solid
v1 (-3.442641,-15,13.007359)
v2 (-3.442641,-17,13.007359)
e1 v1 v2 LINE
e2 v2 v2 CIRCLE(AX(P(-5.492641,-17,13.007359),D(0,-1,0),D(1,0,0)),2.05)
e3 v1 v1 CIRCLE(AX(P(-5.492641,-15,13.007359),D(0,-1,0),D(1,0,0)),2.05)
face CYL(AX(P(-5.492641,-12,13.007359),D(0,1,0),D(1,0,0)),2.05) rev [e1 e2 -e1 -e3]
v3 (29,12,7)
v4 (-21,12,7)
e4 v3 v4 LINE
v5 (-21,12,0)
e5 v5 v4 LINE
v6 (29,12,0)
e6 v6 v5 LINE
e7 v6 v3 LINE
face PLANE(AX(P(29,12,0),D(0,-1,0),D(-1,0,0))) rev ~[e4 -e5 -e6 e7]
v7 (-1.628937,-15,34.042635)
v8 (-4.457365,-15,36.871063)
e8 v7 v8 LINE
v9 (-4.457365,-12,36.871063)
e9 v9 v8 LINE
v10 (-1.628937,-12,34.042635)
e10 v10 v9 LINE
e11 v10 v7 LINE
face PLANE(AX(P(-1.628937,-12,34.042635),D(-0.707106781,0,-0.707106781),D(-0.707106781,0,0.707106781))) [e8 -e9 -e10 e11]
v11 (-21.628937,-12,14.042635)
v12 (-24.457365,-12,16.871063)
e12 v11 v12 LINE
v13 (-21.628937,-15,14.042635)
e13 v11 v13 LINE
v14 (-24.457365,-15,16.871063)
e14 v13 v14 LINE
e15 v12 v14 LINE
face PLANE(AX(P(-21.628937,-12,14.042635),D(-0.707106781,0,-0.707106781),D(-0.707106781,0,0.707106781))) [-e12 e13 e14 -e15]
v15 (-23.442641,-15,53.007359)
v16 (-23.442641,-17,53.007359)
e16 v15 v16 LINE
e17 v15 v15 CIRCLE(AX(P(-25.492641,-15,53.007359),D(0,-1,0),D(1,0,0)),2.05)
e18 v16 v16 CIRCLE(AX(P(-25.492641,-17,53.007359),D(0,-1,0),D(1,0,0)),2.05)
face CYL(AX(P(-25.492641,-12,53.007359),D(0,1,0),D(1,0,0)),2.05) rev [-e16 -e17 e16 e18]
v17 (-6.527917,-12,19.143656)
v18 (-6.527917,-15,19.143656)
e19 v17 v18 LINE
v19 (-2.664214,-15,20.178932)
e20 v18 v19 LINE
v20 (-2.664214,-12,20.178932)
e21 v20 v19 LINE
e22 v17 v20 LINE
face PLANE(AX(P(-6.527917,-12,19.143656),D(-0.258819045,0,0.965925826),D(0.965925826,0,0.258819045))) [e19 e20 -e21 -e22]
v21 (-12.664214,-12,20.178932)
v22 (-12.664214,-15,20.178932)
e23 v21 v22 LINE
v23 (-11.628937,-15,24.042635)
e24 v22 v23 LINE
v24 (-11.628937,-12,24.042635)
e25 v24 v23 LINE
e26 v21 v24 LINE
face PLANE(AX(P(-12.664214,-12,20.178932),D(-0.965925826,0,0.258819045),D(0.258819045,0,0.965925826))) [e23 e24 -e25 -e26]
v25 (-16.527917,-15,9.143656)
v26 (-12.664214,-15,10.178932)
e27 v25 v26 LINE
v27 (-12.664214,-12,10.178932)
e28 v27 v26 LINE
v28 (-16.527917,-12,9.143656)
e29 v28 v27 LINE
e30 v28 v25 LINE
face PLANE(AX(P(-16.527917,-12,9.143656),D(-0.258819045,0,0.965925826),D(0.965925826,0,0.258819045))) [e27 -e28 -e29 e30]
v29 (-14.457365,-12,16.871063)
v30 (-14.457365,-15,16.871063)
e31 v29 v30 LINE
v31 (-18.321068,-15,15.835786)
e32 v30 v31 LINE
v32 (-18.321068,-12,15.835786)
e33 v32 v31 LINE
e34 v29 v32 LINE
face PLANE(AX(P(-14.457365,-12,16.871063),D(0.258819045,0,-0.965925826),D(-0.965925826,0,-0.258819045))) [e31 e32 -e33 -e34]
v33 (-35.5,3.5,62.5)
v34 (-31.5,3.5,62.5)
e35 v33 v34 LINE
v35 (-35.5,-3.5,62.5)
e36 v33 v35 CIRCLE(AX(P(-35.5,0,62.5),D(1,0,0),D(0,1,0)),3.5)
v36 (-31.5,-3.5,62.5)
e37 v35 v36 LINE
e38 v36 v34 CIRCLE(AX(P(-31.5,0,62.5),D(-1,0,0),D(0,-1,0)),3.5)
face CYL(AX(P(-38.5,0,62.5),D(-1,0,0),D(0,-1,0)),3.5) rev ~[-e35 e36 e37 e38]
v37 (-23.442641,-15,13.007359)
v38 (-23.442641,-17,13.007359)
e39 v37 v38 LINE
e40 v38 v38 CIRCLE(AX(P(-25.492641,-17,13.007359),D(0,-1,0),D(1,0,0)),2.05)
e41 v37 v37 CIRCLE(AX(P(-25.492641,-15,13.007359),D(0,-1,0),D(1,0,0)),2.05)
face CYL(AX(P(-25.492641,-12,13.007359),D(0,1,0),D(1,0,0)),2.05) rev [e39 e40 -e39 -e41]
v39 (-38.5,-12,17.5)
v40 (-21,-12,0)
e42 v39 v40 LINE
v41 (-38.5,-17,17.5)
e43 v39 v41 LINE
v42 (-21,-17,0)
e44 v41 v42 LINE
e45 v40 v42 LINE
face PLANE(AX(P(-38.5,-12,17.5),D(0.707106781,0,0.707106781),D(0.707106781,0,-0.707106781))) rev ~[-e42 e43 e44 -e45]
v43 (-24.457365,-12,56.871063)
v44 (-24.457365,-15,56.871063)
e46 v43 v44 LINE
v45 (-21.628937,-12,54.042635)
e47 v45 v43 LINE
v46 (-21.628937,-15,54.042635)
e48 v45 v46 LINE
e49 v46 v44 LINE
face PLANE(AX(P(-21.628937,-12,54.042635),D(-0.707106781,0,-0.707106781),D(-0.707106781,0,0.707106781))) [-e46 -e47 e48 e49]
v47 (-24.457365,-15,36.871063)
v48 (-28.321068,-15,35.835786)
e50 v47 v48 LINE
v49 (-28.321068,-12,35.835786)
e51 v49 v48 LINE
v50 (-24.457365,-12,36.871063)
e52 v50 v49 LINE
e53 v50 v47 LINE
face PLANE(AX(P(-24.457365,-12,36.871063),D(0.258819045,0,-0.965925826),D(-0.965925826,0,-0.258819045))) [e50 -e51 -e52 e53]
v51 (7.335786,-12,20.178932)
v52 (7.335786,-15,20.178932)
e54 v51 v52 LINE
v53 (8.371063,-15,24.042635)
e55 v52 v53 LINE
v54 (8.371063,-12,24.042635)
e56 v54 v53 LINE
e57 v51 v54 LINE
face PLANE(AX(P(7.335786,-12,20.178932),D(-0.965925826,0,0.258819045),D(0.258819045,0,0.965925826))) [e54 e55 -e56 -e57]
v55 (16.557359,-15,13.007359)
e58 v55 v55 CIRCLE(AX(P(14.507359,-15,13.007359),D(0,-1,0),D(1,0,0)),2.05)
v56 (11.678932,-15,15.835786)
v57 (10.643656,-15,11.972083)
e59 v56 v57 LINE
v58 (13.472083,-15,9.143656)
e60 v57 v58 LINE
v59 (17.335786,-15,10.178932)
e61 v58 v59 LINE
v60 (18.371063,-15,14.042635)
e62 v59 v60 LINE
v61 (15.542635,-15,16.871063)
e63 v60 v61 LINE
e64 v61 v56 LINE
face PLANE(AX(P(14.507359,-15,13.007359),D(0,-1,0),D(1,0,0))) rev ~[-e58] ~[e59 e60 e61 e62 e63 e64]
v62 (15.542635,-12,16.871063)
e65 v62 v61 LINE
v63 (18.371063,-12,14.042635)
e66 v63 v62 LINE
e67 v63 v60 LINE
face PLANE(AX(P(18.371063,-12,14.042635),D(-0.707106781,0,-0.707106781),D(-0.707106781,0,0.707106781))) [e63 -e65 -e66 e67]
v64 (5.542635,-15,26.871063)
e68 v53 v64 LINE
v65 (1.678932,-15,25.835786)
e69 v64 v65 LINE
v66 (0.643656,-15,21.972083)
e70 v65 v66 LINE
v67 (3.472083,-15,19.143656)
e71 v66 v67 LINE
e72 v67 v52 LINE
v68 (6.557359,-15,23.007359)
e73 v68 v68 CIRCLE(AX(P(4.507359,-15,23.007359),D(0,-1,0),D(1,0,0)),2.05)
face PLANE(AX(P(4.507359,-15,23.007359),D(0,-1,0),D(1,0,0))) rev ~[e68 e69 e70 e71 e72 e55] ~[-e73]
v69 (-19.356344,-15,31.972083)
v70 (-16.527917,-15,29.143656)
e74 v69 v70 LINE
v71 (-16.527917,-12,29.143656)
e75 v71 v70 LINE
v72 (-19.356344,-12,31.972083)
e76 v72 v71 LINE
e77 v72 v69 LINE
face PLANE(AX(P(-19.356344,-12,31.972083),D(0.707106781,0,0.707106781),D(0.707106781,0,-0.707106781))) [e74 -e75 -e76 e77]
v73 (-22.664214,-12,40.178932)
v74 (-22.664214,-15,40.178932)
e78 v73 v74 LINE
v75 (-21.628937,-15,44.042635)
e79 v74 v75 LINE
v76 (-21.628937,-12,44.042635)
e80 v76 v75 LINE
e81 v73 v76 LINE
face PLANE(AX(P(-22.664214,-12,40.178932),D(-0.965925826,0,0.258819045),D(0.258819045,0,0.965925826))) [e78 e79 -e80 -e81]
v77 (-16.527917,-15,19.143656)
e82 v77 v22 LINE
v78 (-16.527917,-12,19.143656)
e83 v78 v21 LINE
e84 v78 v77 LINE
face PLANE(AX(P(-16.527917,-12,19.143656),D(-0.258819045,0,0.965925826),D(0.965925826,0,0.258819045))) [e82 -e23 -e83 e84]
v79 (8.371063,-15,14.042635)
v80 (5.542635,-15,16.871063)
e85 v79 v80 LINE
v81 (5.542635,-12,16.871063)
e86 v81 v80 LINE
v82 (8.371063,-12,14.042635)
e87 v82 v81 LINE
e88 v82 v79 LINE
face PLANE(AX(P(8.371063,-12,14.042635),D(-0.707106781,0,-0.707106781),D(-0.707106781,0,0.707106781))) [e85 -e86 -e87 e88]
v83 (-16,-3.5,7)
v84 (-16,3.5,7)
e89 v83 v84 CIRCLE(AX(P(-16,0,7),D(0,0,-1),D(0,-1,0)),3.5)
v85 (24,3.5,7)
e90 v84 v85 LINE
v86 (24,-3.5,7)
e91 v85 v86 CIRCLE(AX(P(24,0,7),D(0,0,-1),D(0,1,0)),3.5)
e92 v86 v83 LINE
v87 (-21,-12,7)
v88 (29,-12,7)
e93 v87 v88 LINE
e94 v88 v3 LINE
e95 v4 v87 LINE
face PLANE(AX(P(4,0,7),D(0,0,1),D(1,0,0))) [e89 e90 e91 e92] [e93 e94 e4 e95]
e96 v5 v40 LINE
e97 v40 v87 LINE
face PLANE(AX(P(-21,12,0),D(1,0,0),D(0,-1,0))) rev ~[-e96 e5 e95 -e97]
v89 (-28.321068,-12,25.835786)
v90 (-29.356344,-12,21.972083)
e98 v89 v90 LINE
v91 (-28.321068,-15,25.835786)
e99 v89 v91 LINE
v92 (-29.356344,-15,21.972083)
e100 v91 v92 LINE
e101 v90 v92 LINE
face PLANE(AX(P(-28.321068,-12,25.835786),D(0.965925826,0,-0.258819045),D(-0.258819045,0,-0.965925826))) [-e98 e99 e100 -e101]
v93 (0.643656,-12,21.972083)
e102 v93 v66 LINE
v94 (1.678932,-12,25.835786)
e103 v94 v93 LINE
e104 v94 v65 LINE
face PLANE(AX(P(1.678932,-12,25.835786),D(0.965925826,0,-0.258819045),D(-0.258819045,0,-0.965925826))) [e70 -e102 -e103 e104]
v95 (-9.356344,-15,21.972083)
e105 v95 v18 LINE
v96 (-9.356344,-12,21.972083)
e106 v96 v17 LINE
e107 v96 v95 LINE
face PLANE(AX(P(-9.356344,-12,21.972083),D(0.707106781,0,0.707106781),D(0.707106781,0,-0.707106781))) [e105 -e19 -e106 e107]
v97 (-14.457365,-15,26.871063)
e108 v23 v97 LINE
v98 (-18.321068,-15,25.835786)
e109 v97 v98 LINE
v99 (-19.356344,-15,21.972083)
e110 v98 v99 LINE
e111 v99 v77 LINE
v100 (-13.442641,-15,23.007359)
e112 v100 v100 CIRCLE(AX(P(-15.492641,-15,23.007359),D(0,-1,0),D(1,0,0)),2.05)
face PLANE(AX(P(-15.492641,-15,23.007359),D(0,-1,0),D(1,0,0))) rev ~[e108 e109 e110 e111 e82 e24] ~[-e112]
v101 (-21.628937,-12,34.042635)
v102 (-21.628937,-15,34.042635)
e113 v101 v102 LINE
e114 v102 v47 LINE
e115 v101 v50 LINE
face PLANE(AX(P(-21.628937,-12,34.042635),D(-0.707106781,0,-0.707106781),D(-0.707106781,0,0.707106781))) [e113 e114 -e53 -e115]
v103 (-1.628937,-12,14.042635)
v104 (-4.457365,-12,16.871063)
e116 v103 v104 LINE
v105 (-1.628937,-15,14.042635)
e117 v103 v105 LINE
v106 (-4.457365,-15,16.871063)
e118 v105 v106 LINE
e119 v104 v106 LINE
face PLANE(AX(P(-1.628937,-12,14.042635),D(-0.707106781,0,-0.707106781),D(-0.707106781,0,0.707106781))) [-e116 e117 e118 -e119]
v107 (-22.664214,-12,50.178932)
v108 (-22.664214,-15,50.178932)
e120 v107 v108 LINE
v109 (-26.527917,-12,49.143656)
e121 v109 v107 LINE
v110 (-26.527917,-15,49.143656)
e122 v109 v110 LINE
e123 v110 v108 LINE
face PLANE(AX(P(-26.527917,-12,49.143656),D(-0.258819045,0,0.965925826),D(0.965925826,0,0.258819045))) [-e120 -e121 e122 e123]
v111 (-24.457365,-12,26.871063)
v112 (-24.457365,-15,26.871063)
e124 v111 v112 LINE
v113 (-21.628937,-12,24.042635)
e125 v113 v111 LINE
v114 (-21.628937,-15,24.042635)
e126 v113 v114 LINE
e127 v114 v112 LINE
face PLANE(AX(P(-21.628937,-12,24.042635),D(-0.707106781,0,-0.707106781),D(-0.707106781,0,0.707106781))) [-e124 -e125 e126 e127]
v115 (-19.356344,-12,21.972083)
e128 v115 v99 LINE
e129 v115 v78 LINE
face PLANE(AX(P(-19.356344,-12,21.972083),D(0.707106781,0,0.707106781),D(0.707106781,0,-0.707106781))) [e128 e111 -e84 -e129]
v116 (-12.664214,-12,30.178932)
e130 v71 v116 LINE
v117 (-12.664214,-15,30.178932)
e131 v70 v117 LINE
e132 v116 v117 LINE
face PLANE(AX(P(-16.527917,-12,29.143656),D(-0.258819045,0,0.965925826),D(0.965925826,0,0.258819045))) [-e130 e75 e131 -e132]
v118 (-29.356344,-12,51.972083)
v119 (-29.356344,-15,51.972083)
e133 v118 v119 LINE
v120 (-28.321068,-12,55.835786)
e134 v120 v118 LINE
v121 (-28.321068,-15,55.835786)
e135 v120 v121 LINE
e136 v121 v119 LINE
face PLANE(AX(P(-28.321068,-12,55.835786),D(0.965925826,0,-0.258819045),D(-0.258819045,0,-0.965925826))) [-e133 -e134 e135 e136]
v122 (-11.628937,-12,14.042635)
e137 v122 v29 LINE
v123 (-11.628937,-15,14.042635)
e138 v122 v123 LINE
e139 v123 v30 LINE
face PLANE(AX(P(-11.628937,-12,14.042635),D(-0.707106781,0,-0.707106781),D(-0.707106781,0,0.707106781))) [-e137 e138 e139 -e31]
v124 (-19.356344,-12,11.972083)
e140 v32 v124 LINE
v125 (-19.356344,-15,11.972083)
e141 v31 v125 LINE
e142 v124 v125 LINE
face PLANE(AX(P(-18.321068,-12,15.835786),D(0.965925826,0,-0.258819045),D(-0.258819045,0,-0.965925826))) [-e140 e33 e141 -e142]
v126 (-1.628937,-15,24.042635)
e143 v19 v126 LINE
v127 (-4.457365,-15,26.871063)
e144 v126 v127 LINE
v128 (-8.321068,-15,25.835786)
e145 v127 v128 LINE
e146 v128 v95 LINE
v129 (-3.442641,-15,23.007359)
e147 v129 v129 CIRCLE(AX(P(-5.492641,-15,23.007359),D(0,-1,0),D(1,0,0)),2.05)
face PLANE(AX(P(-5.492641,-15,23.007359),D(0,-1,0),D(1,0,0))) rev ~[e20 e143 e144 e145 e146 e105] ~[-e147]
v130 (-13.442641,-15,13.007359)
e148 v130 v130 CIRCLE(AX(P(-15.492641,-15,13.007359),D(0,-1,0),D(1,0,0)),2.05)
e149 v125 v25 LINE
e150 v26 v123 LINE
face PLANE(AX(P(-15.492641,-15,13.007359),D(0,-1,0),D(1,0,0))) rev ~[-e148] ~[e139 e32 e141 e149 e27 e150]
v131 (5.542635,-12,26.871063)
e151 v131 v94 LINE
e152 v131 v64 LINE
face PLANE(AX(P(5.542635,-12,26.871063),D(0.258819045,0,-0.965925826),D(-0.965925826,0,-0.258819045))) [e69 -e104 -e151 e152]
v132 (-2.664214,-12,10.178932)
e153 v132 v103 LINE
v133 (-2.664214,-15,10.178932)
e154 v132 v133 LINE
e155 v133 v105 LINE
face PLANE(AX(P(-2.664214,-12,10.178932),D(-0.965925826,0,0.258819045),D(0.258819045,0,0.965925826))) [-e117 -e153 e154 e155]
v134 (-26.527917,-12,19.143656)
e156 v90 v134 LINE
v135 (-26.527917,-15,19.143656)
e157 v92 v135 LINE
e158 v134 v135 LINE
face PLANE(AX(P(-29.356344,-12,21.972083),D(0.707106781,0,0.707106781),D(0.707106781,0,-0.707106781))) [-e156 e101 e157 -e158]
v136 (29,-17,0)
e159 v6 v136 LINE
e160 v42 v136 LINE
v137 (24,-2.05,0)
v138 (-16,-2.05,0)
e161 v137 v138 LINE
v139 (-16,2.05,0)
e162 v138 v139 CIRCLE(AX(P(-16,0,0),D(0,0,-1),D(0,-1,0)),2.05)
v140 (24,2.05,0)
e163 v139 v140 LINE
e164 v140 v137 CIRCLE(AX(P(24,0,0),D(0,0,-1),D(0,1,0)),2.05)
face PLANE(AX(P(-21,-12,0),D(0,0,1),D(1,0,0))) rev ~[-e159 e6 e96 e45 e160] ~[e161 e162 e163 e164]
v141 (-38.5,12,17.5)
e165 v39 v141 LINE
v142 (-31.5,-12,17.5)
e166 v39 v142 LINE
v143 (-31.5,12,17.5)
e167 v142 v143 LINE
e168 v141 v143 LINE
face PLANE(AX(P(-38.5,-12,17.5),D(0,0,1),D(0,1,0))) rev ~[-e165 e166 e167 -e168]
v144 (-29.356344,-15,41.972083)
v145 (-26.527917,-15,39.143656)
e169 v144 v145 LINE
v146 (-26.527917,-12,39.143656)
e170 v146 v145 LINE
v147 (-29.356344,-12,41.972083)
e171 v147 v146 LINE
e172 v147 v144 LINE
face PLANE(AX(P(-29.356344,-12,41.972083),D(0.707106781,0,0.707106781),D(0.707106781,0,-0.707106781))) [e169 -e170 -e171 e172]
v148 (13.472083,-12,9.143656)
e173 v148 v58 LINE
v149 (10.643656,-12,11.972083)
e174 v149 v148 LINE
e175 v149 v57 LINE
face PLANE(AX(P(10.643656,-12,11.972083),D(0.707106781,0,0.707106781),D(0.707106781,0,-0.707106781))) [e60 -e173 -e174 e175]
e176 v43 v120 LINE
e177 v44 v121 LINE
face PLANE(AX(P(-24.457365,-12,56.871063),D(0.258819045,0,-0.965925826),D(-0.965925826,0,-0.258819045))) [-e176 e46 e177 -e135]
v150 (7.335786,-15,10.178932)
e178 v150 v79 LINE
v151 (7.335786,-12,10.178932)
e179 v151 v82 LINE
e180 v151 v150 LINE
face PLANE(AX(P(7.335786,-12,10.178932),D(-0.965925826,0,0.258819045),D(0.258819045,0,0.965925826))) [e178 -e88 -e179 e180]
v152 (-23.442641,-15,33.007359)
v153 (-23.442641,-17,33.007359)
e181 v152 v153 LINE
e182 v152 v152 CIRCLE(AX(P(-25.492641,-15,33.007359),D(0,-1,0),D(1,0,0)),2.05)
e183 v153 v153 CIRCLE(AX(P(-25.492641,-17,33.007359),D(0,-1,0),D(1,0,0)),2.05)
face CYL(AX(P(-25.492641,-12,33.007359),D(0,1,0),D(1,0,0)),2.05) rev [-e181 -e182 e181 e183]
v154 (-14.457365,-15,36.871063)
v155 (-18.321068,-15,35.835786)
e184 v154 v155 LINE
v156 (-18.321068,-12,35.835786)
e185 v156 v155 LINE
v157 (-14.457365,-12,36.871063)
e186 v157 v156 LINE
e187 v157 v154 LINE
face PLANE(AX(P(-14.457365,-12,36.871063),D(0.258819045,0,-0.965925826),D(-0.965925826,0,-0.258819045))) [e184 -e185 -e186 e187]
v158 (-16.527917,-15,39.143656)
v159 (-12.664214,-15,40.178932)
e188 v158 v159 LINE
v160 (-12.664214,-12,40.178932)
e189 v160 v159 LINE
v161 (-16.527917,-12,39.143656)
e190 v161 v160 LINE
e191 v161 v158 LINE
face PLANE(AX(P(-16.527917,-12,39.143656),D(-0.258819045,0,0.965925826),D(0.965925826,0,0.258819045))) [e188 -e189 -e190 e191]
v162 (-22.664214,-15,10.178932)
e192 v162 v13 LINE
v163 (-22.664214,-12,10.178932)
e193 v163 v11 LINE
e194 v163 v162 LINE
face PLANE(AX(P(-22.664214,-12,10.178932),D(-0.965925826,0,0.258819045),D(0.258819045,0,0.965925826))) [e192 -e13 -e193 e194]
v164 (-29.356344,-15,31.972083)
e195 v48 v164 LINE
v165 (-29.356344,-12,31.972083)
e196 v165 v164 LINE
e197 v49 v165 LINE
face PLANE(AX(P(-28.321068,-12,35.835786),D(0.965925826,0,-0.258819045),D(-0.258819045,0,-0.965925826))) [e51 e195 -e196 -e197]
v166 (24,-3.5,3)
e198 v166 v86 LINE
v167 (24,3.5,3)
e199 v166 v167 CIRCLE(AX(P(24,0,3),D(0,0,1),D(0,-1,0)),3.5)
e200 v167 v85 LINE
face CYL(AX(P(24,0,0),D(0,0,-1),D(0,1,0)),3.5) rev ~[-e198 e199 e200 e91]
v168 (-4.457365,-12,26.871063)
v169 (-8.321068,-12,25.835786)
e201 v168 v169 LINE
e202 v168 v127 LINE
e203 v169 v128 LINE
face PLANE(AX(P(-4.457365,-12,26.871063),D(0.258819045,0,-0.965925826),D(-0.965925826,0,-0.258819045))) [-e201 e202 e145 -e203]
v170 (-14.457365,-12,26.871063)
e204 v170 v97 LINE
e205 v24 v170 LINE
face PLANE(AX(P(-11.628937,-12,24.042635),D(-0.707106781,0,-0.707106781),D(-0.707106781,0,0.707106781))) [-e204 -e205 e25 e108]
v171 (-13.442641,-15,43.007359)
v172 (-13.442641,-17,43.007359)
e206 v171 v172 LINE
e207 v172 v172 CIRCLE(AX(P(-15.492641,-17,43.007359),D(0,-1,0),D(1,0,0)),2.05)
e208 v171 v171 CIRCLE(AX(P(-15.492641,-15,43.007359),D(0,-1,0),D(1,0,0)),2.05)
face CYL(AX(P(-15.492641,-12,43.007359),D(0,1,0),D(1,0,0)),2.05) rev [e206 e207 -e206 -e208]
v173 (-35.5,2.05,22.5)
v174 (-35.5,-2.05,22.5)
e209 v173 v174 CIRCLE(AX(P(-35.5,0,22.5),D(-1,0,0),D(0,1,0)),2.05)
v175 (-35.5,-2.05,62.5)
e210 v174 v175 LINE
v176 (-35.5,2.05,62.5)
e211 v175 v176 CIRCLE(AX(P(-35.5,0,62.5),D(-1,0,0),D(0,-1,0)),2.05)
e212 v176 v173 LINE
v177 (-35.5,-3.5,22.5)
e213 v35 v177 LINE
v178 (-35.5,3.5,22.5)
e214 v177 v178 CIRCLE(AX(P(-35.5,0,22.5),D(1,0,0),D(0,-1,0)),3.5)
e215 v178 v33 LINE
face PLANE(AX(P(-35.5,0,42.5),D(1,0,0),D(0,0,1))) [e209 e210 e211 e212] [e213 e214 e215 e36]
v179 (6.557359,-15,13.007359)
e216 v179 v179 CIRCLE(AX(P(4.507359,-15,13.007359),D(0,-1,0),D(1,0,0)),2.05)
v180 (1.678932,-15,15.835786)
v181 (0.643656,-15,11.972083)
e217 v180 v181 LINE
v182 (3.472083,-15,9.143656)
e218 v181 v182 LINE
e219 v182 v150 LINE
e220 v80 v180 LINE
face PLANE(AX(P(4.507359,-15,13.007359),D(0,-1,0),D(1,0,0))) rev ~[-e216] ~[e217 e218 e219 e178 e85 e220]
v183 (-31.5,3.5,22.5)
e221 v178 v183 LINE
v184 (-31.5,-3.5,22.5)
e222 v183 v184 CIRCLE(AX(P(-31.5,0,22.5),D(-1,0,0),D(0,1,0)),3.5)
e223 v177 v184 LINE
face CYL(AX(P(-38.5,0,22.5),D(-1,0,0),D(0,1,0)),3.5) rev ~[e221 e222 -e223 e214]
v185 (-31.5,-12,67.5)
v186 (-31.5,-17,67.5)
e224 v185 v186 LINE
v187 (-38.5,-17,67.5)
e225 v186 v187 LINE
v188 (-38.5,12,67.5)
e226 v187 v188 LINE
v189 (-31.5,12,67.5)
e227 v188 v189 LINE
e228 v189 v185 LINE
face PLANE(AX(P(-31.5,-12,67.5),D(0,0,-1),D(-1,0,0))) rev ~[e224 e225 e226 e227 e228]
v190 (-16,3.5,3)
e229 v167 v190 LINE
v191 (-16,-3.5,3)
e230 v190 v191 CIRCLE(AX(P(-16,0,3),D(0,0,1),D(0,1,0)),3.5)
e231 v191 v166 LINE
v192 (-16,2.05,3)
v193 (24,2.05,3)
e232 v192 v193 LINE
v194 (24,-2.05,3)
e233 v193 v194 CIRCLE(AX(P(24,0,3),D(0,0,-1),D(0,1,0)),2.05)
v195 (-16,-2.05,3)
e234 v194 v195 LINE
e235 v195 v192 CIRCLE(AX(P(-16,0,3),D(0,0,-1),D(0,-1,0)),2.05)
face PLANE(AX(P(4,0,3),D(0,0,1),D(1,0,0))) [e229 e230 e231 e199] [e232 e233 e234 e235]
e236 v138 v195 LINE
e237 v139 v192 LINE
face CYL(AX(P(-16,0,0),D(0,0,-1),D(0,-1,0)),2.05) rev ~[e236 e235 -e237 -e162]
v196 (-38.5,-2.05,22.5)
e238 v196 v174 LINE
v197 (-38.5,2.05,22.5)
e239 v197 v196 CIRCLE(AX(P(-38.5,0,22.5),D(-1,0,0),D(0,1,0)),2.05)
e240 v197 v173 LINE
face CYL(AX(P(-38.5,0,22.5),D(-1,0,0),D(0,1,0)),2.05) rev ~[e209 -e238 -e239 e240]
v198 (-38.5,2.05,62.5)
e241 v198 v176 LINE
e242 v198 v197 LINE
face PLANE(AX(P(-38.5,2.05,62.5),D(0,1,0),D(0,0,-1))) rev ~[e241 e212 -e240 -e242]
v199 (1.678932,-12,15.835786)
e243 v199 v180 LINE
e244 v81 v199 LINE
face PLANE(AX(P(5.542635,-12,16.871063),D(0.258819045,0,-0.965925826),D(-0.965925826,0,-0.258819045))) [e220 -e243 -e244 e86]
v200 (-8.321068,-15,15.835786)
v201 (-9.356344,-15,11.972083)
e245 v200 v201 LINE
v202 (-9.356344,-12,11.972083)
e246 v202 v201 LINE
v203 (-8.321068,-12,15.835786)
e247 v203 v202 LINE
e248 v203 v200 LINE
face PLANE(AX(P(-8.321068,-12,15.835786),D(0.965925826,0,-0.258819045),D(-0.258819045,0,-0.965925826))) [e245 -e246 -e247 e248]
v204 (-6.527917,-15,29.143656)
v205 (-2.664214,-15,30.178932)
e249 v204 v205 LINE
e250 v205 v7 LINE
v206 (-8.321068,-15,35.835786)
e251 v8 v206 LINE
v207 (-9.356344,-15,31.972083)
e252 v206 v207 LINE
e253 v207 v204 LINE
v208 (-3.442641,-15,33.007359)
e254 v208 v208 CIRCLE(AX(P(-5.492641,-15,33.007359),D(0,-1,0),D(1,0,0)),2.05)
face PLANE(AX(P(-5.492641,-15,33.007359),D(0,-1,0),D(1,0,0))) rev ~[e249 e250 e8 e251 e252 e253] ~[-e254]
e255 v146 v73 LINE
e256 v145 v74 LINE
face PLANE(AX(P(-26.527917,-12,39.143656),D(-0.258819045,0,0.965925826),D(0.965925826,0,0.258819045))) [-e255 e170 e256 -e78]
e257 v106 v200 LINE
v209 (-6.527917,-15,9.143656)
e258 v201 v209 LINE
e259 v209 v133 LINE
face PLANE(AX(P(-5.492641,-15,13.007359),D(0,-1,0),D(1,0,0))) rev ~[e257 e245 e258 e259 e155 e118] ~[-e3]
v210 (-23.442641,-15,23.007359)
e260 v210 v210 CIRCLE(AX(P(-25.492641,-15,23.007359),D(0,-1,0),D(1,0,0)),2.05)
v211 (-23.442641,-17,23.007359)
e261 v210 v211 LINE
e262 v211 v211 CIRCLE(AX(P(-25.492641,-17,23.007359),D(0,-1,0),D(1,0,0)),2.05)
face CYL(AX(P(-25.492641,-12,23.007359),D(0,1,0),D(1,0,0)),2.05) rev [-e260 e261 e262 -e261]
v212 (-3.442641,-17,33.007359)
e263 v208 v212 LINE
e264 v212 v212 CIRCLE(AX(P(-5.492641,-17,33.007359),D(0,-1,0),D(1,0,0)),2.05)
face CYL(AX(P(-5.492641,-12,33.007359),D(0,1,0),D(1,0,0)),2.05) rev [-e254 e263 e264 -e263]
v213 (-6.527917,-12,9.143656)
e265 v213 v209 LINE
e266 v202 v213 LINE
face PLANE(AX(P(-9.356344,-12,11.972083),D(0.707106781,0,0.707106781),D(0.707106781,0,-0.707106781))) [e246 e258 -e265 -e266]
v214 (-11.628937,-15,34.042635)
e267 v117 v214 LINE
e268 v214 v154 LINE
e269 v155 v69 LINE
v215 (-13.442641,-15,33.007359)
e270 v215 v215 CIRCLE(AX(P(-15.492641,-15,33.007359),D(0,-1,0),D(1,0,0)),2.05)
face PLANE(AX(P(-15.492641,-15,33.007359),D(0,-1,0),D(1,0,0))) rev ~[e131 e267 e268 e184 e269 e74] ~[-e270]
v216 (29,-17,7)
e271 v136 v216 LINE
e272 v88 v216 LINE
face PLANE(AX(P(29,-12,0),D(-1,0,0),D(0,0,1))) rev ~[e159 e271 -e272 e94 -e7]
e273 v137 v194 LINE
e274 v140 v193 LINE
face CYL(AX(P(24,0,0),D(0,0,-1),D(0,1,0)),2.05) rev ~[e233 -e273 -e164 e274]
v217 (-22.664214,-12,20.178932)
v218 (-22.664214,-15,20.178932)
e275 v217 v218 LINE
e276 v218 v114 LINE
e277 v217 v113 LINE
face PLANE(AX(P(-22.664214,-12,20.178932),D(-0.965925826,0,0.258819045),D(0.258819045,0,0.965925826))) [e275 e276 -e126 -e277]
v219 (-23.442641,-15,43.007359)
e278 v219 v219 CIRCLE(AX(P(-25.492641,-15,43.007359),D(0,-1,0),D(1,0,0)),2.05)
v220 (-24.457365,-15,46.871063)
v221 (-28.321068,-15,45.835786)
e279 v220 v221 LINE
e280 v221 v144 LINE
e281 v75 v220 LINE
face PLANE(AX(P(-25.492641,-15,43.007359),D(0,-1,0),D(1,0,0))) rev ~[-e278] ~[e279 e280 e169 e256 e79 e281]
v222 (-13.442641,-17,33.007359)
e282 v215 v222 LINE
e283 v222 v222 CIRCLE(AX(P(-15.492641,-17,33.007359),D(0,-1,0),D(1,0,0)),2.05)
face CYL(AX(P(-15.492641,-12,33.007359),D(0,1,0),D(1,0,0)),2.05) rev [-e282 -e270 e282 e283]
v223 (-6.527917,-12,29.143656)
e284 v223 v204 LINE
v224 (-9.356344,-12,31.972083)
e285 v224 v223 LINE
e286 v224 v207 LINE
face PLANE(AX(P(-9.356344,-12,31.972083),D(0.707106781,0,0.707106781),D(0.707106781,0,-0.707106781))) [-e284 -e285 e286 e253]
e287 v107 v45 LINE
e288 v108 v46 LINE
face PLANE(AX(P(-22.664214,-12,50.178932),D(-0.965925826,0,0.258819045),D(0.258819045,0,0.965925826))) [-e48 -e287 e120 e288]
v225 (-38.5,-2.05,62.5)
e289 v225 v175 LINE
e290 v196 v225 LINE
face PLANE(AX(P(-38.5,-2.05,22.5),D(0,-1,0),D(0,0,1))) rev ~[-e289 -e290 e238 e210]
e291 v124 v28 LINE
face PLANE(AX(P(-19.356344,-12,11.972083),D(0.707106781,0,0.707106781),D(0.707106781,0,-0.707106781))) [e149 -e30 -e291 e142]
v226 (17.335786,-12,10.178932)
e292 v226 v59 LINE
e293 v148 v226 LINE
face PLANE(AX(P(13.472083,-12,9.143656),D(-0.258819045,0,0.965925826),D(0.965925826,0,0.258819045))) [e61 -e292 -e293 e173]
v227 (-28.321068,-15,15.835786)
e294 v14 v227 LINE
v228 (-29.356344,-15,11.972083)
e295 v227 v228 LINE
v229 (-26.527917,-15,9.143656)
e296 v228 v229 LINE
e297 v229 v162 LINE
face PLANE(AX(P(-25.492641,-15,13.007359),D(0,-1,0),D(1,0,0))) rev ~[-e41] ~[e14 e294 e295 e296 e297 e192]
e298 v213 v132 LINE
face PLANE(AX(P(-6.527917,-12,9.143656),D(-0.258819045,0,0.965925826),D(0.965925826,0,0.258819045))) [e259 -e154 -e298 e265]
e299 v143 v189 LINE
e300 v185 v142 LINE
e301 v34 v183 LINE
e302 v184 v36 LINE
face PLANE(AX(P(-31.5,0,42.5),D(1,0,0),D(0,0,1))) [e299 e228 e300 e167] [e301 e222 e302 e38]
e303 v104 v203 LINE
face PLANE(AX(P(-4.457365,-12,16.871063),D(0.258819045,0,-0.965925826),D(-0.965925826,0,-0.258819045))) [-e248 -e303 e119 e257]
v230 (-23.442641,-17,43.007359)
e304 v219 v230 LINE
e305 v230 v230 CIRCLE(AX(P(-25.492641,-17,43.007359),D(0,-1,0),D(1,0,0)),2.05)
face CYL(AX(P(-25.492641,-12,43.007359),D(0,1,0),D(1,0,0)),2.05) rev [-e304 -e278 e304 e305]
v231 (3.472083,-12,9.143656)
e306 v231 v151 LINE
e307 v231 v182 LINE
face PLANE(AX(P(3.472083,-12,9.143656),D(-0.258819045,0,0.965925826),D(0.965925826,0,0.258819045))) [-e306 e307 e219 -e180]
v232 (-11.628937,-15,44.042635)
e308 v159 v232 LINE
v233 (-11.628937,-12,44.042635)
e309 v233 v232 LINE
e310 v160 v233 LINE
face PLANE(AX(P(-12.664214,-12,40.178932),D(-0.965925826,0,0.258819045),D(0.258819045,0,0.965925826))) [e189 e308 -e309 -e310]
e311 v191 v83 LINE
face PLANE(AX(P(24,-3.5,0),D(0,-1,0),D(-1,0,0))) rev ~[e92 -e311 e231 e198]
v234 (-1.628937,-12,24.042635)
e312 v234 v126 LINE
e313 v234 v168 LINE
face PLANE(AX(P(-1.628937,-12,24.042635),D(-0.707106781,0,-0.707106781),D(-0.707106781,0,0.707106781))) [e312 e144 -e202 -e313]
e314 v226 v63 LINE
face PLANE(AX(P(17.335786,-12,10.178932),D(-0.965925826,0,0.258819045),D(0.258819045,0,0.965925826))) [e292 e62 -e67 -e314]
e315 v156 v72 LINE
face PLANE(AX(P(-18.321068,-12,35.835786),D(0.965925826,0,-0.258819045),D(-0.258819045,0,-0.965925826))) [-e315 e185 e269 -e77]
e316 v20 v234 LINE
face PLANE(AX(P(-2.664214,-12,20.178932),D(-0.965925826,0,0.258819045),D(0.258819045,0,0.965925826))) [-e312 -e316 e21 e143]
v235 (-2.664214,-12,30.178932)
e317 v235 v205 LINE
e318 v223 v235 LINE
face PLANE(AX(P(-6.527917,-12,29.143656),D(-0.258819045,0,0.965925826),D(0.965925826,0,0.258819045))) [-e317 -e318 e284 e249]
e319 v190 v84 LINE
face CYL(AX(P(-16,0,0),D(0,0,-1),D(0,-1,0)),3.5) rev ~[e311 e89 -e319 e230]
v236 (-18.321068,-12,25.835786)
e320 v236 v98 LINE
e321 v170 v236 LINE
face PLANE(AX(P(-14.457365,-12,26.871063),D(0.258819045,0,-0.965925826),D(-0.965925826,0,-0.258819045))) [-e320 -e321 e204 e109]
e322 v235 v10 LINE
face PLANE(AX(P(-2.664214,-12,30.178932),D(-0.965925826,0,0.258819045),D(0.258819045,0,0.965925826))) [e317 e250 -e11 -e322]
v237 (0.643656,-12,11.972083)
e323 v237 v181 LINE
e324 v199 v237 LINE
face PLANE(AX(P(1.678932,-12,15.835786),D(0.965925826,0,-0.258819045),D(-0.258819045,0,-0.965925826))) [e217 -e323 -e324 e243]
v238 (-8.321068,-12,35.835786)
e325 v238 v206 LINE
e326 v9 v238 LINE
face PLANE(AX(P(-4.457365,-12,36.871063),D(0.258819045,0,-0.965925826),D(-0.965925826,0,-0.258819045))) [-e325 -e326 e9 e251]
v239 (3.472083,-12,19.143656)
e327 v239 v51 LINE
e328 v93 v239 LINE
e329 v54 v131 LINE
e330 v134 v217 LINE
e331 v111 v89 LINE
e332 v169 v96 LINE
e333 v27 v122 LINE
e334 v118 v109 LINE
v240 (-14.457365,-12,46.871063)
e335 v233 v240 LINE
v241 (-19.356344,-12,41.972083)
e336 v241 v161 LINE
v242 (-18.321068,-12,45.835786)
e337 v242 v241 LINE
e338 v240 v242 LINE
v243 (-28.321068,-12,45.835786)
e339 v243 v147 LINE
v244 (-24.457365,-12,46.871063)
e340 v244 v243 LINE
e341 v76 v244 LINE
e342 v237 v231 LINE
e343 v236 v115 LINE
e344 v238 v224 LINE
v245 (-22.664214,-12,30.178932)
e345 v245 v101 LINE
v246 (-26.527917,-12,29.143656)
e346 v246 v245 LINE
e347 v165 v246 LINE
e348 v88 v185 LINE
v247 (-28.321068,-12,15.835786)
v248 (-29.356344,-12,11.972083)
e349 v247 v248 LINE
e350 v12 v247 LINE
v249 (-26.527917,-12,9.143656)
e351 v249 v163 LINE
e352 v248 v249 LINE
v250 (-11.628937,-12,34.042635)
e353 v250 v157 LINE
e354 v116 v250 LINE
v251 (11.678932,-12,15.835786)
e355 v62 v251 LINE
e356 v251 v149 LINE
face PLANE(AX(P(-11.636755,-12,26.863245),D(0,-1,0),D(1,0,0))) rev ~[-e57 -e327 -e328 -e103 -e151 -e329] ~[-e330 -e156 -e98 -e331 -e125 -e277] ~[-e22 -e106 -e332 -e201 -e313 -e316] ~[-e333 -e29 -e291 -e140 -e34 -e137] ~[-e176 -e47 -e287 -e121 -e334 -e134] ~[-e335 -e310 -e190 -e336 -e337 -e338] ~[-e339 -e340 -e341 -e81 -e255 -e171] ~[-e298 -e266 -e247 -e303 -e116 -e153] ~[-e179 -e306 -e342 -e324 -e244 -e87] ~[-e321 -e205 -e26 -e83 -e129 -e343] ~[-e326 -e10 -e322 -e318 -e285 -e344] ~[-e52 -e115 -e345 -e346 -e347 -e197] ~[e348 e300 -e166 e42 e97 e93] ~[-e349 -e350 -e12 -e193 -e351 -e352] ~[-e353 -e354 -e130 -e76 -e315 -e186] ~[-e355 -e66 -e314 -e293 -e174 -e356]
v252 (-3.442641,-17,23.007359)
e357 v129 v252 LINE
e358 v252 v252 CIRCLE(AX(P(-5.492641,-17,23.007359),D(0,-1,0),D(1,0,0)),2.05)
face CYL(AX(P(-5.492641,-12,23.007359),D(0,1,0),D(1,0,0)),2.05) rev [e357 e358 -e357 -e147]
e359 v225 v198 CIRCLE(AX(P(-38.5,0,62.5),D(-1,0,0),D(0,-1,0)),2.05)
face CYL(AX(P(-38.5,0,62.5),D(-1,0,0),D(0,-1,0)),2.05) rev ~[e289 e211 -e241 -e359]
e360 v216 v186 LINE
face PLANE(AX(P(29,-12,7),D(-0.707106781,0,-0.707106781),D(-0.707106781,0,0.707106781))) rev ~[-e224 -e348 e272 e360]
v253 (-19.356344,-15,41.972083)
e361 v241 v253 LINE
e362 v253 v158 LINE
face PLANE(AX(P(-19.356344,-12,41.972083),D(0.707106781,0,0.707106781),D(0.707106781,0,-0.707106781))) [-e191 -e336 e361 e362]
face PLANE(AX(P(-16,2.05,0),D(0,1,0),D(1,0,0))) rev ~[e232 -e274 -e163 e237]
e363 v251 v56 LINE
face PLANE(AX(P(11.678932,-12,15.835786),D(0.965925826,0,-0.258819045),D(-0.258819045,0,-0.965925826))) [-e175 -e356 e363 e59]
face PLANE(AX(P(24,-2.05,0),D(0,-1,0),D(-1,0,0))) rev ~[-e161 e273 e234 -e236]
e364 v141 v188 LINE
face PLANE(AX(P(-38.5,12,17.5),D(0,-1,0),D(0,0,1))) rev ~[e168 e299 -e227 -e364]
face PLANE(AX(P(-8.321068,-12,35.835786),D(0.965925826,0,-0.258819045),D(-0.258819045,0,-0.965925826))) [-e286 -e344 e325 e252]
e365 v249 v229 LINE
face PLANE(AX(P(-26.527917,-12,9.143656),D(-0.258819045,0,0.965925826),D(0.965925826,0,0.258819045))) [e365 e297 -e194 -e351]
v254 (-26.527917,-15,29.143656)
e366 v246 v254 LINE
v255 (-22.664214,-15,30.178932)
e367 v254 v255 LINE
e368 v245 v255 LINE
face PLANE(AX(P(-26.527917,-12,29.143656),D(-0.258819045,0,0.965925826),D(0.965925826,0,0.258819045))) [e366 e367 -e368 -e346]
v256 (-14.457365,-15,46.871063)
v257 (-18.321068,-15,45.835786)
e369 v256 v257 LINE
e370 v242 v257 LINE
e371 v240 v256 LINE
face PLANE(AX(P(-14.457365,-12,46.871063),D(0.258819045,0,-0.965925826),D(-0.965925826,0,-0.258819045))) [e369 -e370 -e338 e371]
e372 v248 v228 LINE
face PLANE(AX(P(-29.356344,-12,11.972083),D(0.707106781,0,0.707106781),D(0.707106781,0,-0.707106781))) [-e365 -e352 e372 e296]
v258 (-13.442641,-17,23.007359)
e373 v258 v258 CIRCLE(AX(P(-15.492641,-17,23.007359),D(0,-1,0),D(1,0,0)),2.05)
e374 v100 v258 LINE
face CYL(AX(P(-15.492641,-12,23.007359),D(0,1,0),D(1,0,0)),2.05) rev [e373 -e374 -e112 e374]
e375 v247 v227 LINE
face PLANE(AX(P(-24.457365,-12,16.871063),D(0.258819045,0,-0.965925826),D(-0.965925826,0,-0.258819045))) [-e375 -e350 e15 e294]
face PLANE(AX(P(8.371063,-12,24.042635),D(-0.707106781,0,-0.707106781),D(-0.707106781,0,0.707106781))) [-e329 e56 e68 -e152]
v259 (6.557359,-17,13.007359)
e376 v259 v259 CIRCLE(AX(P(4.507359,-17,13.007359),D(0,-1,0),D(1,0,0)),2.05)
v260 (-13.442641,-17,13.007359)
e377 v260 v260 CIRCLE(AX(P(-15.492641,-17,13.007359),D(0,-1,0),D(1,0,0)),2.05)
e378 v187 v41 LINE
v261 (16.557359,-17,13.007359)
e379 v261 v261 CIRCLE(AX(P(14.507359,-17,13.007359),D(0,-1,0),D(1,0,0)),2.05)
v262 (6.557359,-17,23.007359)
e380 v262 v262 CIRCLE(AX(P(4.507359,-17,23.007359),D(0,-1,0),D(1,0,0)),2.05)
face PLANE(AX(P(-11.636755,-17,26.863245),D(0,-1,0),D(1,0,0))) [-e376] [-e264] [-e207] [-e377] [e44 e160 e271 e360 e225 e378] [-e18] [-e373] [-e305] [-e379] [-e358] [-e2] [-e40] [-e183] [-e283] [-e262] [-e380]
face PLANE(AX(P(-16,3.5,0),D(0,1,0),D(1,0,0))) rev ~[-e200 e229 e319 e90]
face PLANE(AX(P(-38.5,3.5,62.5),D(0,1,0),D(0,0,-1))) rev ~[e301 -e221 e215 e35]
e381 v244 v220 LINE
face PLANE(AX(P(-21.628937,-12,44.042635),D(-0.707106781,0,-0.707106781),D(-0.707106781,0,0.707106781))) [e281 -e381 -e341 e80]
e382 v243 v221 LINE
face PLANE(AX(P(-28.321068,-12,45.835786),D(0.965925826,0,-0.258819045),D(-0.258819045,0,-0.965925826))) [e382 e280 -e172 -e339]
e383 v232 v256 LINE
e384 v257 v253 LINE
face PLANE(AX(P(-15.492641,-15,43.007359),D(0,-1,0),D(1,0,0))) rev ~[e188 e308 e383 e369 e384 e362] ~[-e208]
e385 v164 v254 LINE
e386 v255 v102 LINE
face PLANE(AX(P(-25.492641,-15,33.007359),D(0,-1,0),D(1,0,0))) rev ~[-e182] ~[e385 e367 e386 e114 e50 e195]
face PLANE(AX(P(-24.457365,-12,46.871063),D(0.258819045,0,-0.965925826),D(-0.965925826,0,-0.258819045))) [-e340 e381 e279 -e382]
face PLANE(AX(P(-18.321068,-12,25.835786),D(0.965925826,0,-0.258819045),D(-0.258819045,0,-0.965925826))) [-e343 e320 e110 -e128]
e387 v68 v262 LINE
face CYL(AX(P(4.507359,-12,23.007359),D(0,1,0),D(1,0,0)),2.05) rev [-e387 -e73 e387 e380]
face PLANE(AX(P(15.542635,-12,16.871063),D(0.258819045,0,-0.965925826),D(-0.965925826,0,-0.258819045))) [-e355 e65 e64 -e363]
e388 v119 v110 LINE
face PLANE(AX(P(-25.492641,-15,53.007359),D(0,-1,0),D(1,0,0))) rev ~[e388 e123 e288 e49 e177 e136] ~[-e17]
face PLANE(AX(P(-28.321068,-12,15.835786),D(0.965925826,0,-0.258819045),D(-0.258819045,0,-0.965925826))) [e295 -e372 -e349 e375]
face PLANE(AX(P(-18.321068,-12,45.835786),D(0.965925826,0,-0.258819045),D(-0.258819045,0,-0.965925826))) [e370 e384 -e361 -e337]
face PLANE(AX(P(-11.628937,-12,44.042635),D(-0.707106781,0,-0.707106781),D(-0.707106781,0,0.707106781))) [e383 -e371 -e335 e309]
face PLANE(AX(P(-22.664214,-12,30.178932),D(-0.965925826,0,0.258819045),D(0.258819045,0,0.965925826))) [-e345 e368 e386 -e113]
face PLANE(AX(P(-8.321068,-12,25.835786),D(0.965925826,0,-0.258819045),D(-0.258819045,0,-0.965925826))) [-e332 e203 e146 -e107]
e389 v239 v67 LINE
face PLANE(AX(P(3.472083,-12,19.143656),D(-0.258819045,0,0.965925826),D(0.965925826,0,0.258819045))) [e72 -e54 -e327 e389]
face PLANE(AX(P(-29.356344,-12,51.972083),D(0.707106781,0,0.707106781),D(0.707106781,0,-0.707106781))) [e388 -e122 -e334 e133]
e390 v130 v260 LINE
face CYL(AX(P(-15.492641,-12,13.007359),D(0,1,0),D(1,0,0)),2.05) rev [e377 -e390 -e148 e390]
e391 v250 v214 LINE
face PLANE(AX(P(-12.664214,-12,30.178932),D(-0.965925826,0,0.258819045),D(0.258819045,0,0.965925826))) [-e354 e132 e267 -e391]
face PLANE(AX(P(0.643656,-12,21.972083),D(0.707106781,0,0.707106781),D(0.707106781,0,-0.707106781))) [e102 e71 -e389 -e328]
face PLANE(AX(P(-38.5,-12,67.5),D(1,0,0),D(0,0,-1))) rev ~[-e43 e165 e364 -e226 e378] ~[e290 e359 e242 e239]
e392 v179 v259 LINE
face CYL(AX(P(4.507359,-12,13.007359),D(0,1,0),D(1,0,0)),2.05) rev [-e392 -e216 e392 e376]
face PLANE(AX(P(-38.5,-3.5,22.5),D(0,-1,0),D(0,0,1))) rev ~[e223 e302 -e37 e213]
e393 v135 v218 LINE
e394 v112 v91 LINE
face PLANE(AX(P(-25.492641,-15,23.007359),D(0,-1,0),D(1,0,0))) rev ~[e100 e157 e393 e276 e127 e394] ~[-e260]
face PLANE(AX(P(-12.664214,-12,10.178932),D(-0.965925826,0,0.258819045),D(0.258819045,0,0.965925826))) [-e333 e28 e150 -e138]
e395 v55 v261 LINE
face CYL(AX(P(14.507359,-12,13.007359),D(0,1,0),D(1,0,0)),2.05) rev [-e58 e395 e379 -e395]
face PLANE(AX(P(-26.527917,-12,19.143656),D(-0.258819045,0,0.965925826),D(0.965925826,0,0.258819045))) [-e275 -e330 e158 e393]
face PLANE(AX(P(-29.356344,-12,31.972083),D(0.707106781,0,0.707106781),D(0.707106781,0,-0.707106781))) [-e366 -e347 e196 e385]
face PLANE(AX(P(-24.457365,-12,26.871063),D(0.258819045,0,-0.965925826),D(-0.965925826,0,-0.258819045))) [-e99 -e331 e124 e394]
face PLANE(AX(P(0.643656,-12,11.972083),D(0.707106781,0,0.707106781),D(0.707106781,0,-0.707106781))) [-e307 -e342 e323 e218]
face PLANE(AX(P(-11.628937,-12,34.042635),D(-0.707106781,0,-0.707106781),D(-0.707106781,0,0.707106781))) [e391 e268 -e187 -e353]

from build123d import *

# Parameters (mm, degrees)
F1_DEPTH  = 7
F2_DEPTH  = 3
F4_ANGLE  = 90
F8_ANGLE  = 180
F12_R     = 2.05
F13_DEPTH = 5
F14_DEPTH = 3


# Not quite as in the source:
# - a feature names something its author has since deleted; it is built from what else it names


with BuildPart() as f1:
    # F0 (on Top) → F1 (new body)
    with BuildSketch(Plane.XY):
        Polygon((29, 12), (-21, 12), (-21, -12), (0, -12), (29, -12), align=None)
        with BuildLine():
            ThreePointArc((-16, -11.5), (-19.5, -8), (-16, -4.5))
            Line((-16, -4.5), (0, -4.5))
            Line((0, -4.5), (24, -4.5))
            ThreePointArc((24, -4.5), (27.5, -8), (24, -11.5))
            Line((24, -11.5), (0, -11.5))
            Line((0, -11.5), (-16, -11.5))
        make_face(mode=Mode.SUBTRACT)
        with BuildLine():
            Line((0, -3.5), (-16, -3.5))
            ThreePointArc((-16, -3.5), (-19.5, 0), (-16, 3.5))
            Line((-16, 3.5), (0, 3.5))
            Line((0, 3.5), (24, 3.5))
            ThreePointArc((24, 3.5), (27.5, 0), (24, -3.5))
            Line((24, -3.5), (0, -3.5))
        make_face(mode=Mode.SUBTRACT)
        with BuildLine():
            Line((0, 4.5), (-16, 4.5))
            ThreePointArc((-16, 4.5), (-19.5, 8), (-16, 11.5))
            Line((-16, 11.5), (0, 11.5))
            Line((0, 11.5), (24, 11.5))
            ThreePointArc((24, 11.5), (27.5, 8), (24, 4.5))
            Line((24, 4.5), (0, 4.5))
        make_face(mode=Mode.SUBTRACT)
        with BuildLine():
            Line((0, -4.5), (-16, -4.5))
            ThreePointArc((-16, -4.5), (-19.5, -8), (-16, -11.5))
            Line((-16, -11.5), (0, -11.5))
            Line((0, -11.5), (24, -11.5))
            ThreePointArc((24, -11.5), (27.5, -8), (24, -4.5))
            Line((24, -4.5), (0, -4.5))
        make_face()
        with BuildLine():
            ThreePointArc((-16, -10.05), (-18.05, -8), (-16, -5.95))
            Line((-16, -5.95), (0, -5.95))
            Line((0, -5.95), (24, -5.95))
            ThreePointArc((24, -5.95), (26.05, -8), (24, -10.05))
            Line((24, -10.05), (0, -10.05))
            Line((0, -10.05), (-16, -10.05))
        make_face(mode=Mode.SUBTRACT)
        with BuildLine():
            ThreePointArc((-16, 11.5), (-19.5, 8), (-16, 4.5))
            Line((-16, 4.5), (0, 4.5))
            Line((0, 4.5), (24, 4.5))
            ThreePointArc((24, 4.5), (27.5, 8), (24, 11.5))
            Line((24, 11.5), (0, 11.5))
            Line((0, 11.5), (-16, 11.5))
        make_face()
        with BuildLine():
            Line((24, 5.95), (0, 5.95))
            Line((0, 5.95), (-16, 5.95))
            ThreePointArc((-16, 5.95), (-18.05, 8), (-16, 10.05))
            Line((-16, 10.05), (0, 10.05))
            Line((0, 10.05), (24, 10.05))
            ThreePointArc((24, 10.05), (26.05, 8), (24, 5.95))
        make_face(mode=Mode.SUBTRACT)
        with BuildLine():
            Line((0, -5.95), (-16, -5.95))
            ThreePointArc((-16, -5.95), (-18.05, -8), (-16, -10.05))
            Line((-16, -10.05), (0, -10.05))
            Line((0, -10.05), (24, -10.05))
            ThreePointArc((24, -10.05), (26.05, -8), (24, -5.95))
            Line((24, -5.95), (0, -5.95))
        make_face()
        with BuildLine():
            Line((-16, 5.95), (0, 5.95))
            Line((0, 5.95), (24, 5.95))
            ThreePointArc((24, 5.95), (26.05, 8), (24, 10.05))
            Line((24, 10.05), (0, 10.05))
            Line((0, 10.05), (-16, 10.05))
            ThreePointArc((-16, 10.05), (-18.05, 8), (-16, 5.95))
        make_face()
    extrude(amount=F1_DEPTH)

    # F0 (on Top) → F2 (join)
    with BuildSketch(Plane.XY):
        with BuildLine():
            ThreePointArc((-16, 3.5), (-19.5, 0), (-16, -3.5))
            Line((-16, -3.5), (0, -3.5))
            Line((0, -3.5), (24, -3.5))
            ThreePointArc((24, -3.5), (27.5, 0), (24, 3.5))
            Line((24, 3.5), (0, 3.5))
            Line((0, 3.5), (-16, 3.5))
        make_face()
        with BuildLine():
            Line((0, -2.05), (-16, -2.05))
            ThreePointArc((-16, -2.05), (-18.05, 0), (-16, 2.05))
            Line((-16, 2.05), (0, 2.05))
            Line((0, 2.05), (24, 2.05))
            ThreePointArc((24, 2.05), (26.05, 0), (24, -2.05))
            Line((24, -2.05), (0, -2.05))
        make_face(mode=Mode.SUBTRACT)
    extrude(amount=F2_DEPTH)


with BuildPart() as f4_1:
    # F4: copy of F1
    add(f1.part.rotate(Axis((-21, 0, 3.5), (0, -1, 0)), F4_ANGLE))


with BuildPart() as f4_1_1:
    # F8: moved
    add(f4_1.part.rotate(Axis((-21, 0, 28.5), (0, 0, 1)), F8_ANGLE))


with BuildPart() as f4_1_2:
    # F9: moved
    add(f4_1_1.part.moved(Location((0, 0, 14))))


with BuildPart() as f4_1_3:
    # F10: moved
    add(f4_1_2.part.moved(Location((-14, 0, 0))))


with BuildPart() as f1_1:
    add(f1.part)

    add(f4_1_3.part)  # F13 merges F4_1
    # F12 (on 3pt) → F13 (join)
    with BuildSketch(Plane.XZ.offset(12)):
        Polygon((-38.5, 17.5), (-21, 0), (29, 0), (29, 7), (-31.5, 67.5), (-38.5, 67.5), align=None)
        Polygon((-29.3563439923, 11.9720831325), (-28.3210678119, 15.8357864376), (-24.4573645067, 16.871062618), (-21.628937382, 14.0426354933), (-22.6642135624, 10.1789321881), (-26.5279168675, 9.1436560077), align=None, mode=Mode.SUBTRACT)
        Polygon((-19.3563439923, 11.9720831325), (-18.3210678119, 15.8357864376), (-14.4573645067, 16.871062618), (-11.628937382, 14.0426354933), (-12.6642135624, 10.1789321881), (-16.5279168675, 9.1436560077), align=None, mode=Mode.SUBTRACT)
        Polygon((-9.3563439923, 11.9720831325), (-8.3210678119, 15.8357864376), (-4.4573645067, 16.871062618), (-1.628937382, 14.0426354933), (-2.6642135624, 10.1789321881), (-6.5279168675, 9.1436560077), align=None, mode=Mode.SUBTRACT)
        Polygon((-29.3563439923, 21.9720831325), (-28.3210678119, 25.8357864376), (-24.4573645067, 26.871062618), (-21.628937382, 24.0426354933), (-22.6642135624, 20.1789321881), (-26.5279168675, 19.1436560077), align=None, mode=Mode.SUBTRACT)
        Polygon((-29.3563439923, 31.9720831325), (-28.3210678119, 35.8357864376), (-24.4573645067, 36.871062618), (-21.628937382, 34.0426354933), (-22.6642135624, 30.1789321881), (-26.5279168675, 29.1436560077), align=None, mode=Mode.SUBTRACT)
        Polygon((-19.3563439923, 21.9720831325), (-18.3210678119, 25.8357864376), (-14.4573645067, 26.871062618), (-11.628937382, 24.0426354933), (-12.6642135624, 20.1789321881), (-16.5279168675, 19.1436560077), align=None, mode=Mode.SUBTRACT)
        Polygon((-9.3563439923, 21.9720831325), (-8.3210678119, 25.8357864376), (-4.4573645067, 26.871062618), (-1.628937382, 24.0426354933), (-2.6642135624, 20.1789321881), (-6.5279168675, 19.1436560077), align=None, mode=Mode.SUBTRACT)
        Polygon((-19.3563439923, 31.9720831325), (-18.3210678119, 35.8357864376), (-14.4573645067, 36.871062618), (-11.628937382, 34.0426354933), (-12.6642135624, 30.1789321881), (-16.5279168675, 29.1436560077), align=None, mode=Mode.SUBTRACT)
        Polygon((-9.3563439923, 31.9720831325), (-8.3210678119, 35.8357864376), (-4.4573645067, 36.871062618), (-1.628937382, 34.0426354933), (-2.6642135624, 30.1789321881), (-6.5279168675, 29.1436560077), align=None, mode=Mode.SUBTRACT)
        Polygon((0.6436560077, 11.9720831325), (1.6789321881, 15.8357864376), (5.5426354933, 16.871062618), (8.371062618, 14.0426354933), (7.3357864376, 10.1789321881), (3.4720831325, 9.1436560077), align=None, mode=Mode.SUBTRACT)
        Polygon((10.6436560077, 11.9720831325), (11.6789321881, 15.8357864376), (15.5426354933, 16.871062618), (18.371062618, 14.0426354933), (17.3357864376, 10.1789321881), (13.4720831325, 9.1436560077), align=None, mode=Mode.SUBTRACT)
        Polygon((0.6436560077, 21.9720831325), (1.6789321881, 25.8357864376), (5.5426354933, 26.871062618), (8.371062618, 24.0426354933), (7.3357864376, 20.1789321881), (3.4720831325, 19.1436560077), align=None, mode=Mode.SUBTRACT)
        Polygon((-29.3563439923, 41.9720831325), (-28.3210678119, 45.8357864376), (-24.4573645067, 46.871062618), (-21.628937382, 44.0426354933), (-22.6642135624, 40.1789321881), (-26.5279168675, 39.1436560077), align=None, mode=Mode.SUBTRACT)
        Polygon((-19.3563439923, 41.9720831325), (-18.3210678119, 45.8357864376), (-14.4573645067, 46.871062618), (-11.628937382, 44.0426354933), (-12.6642135624, 40.1789321881), (-16.5279168675, 39.1436560077), align=None, mode=Mode.SUBTRACT)
        Polygon((-26.5279168675, 49.1436560077), (-29.3563439923, 51.9720831325), (-28.3210678119, 55.8357864376), (-24.4573645067, 56.871062618), (-21.628937382, 54.0426354933), (-22.6642135624, 50.1789321881), align=None, mode=Mode.SUBTRACT)
        Polygon((-4.4573645067, 36.871062618), (-8.3210678119, 35.8357864376), (-9.3563439923, 31.9720831325), (-6.5279168675, 29.1436560077), (-2.6642135624, 30.1789321881), (-1.628937382, 34.0426354933), align=None)
        with Locations((-5.4926406871, 33.0073593129)):
            Circle(F12_R, mode=Mode.SUBTRACT)
        Polygon((-14.4573645067, 46.871062618), (-18.3210678119, 45.8357864376), (-19.3563439923, 41.9720831325), (-16.5279168675, 39.1436560077), (-12.6642135624, 40.1789321881), (-11.628937382, 44.0426354933), align=None)
        with Locations((-15.4926406871, 43.0073593129)):
            Circle(F12_R, mode=Mode.SUBTRACT)
        Polygon((-14.4573645067, 36.871062618), (-18.3210678119, 35.8357864376), (-19.3563439923, 31.9720831325), (-16.5279168675, 29.1436560077), (-12.6642135624, 30.1789321881), (-11.628937382, 34.0426354933), align=None)
        with Locations((-15.4926406871, 33.0073593129)):
            Circle(F12_R, mode=Mode.SUBTRACT)
        Polygon((-14.4573645067, 26.871062618), (-18.3210678119, 25.8357864376), (-19.3563439923, 21.9720831325), (-16.5279168675, 19.1436560077), (-12.6642135624, 20.1789321881), (-11.628937382, 24.0426354933), align=None)
        with Locations((-15.4926406871, 23.0073593129)):
            Circle(F12_R, mode=Mode.SUBTRACT)
        Polygon((-4.4573645067, 26.871062618), (-8.3210678119, 25.8357864376), (-9.3563439923, 21.9720831325), (-6.5279168675, 19.1436560077), (-2.6642135624, 20.1789321881), (-1.628937382, 24.0426354933), align=None)
        with Locations((-5.4926406871, 23.0073593129)):
            Circle(F12_R, mode=Mode.SUBTRACT)
        Polygon((5.5426354933, 26.871062618), (1.6789321881, 25.8357864376), (0.6436560077, 21.9720831325), (3.4720831325, 19.1436560077), (7.3357864376, 20.1789321881), (8.371062618, 24.0426354933), align=None)
        with Locations((4.5073593129, 23.0073593129)):
            Circle(F12_R, mode=Mode.SUBTRACT)
        Polygon((-28.3210678119, 55.8357864376), (-29.3563439923, 51.9720831325), (-26.5279168675, 49.1436560077), (-22.6642135624, 50.1789321881), (-21.628937382, 54.0426354933), (-24.4573645067, 56.871062618), align=None)
        with Locations((-25.4926406871, 53.0073593129)):
            Circle(F12_R, mode=Mode.SUBTRACT)
        Polygon((-24.4573645067, 46.871062618), (-28.3210678119, 45.8357864376), (-29.3563439923, 41.9720831325), (-26.5279168675, 39.1436560077), (-22.6642135624, 40.1789321881), (-21.628937382, 44.0426354933), align=None)
        with Locations((-25.4926406871, 43.0073593129)):
            Circle(F12_R, mode=Mode.SUBTRACT)
        Polygon((-24.4573645067, 36.871062618), (-28.3210678119, 35.8357864376), (-29.3563439923, 31.9720831325), (-26.5279168675, 29.1436560077), (-22.6642135624, 30.1789321881), (-21.628937382, 34.0426354933), align=None)
        with Locations((-25.4926406871, 33.0073593129)):
            Circle(F12_R, mode=Mode.SUBTRACT)
        Polygon((-24.4573645067, 26.871062618), (-28.3210678119, 25.8357864376), (-29.3563439923, 21.9720831325), (-26.5279168675, 19.1436560077), (-22.6642135624, 20.1789321881), (-21.628937382, 24.0426354933), align=None)
        with Locations((-25.4926406871, 23.0073593129)):
            Circle(F12_R, mode=Mode.SUBTRACT)
        Polygon((-24.4573645067, 16.871062618), (-28.3210678119, 15.8357864376), (-29.3563439923, 11.9720831325), (-26.5279168675, 9.1436560077), (-22.6642135624, 10.1789321881), (-21.628937382, 14.0426354933), align=None)
        with Locations((-25.4926406871, 13.0073593129)):
            Circle(F12_R, mode=Mode.SUBTRACT)
        Polygon((-14.4573645067, 16.871062618), (-18.3210678119, 15.8357864376), (-19.3563439923, 11.9720831325), (-16.5279168675, 9.1436560077), (-12.6642135624, 10.1789321881), (-11.628937382, 14.0426354933), align=None)
        with Locations((-15.4926406871, 13.0073593129)):
            Circle(F12_R, mode=Mode.SUBTRACT)
        Polygon((-4.4573645067, 16.871062618), (-8.3210678119, 15.8357864376), (-9.3563439923, 11.9720831325), (-6.5279168675, 9.1436560077), (-2.6642135624, 10.1789321881), (-1.628937382, 14.0426354933), align=None)
        with Locations((-5.4926406871, 13.0073593129)):
            Circle(F12_R, mode=Mode.SUBTRACT)
        Polygon((5.5426354933, 16.871062618), (1.6789321881, 15.8357864376), (0.6436560077, 11.9720831325), (3.4720831325, 9.1436560077), (7.3357864376, 10.1789321881), (8.371062618, 14.0426354933), align=None)
        with Locations((4.5073593129, 13.0073593129)):
            Circle(F12_R, mode=Mode.SUBTRACT)
        Polygon((15.5426354933, 16.871062618), (11.6789321881, 15.8357864376), (10.6436560077, 11.9720831325), (13.4720831325, 9.1436560077), (17.3357864376, 10.1789321881), (18.371062618, 14.0426354933), align=None)
        with Locations((14.5073593129, 13.0073593129)):
            Circle(F12_R, mode=Mode.SUBTRACT)
    extrude(amount=F13_DEPTH)

    # F12 (on 3pt) → F14 (cut)
    with BuildSketch(Plane.XZ.offset(12)):
        Polygon((-4.4573645067, 36.871062618), (-8.3210678119, 35.8357864376), (-9.3563439923, 31.9720831325), (-6.5279168675, 29.1436560077), (-2.6642135624, 30.1789321881), (-1.628937382, 34.0426354933), align=None)
        with Locations((-5.4926406871, 33.0073593129)):
            Circle(F12_R, mode=Mode.SUBTRACT)
        Polygon((5.5426354933, 26.871062618), (1.6789321881, 25.8357864376), (0.6436560077, 21.9720831325), (3.4720831325, 19.1436560077), (7.3357864376, 20.1789321881), (8.371062618, 24.0426354933), align=None)
        with Locations((4.5073593129, 23.0073593129)):
            Circle(F12_R, mode=Mode.SUBTRACT)
        Polygon((-4.4573645067, 26.871062618), (-8.3210678119, 25.8357864376), (-9.3563439923, 21.9720831325), (-6.5279168675, 19.1436560077), (-2.6642135624, 20.1789321881), (-1.628937382, 24.0426354933), align=None)
        with Locations((-5.4926406871, 23.0073593129)):
            Circle(F12_R, mode=Mode.SUBTRACT)
        Polygon((-14.4573645067, 26.871062618), (-18.3210678119, 25.8357864376), (-19.3563439923, 21.9720831325), (-16.5279168675, 19.1436560077), (-12.6642135624, 20.1789321881), (-11.628937382, 24.0426354933), align=None)
        with Locations((-15.4926406871, 23.0073593129)):
            Circle(F12_R, mode=Mode.SUBTRACT)
        Polygon((-14.4573645067, 36.871062618), (-18.3210678119, 35.8357864376), (-19.3563439923, 31.9720831325), (-16.5279168675, 29.1436560077), (-12.6642135624, 30.1789321881), (-11.628937382, 34.0426354933), align=None)
        with Locations((-15.4926406871, 33.0073593129)):
            Circle(F12_R, mode=Mode.SUBTRACT)
        Polygon((-14.4573645067, 46.871062618), (-18.3210678119, 45.8357864376), (-19.3563439923, 41.9720831325), (-16.5279168675, 39.1436560077), (-12.6642135624, 40.1789321881), (-11.628937382, 44.0426354933), align=None)
        with Locations((-15.4926406871, 43.0073593129)):
            Circle(F12_R, mode=Mode.SUBTRACT)
        Polygon((15.5426354933, 16.871062618), (11.6789321881, 15.8357864376), (10.6436560077, 11.9720831325), (13.4720831325, 9.1436560077), (17.3357864376, 10.1789321881), (18.371062618, 14.0426354933), align=None)
        with Locations((14.5073593129, 13.0073593129)):
            Circle(F12_R, mode=Mode.SUBTRACT)
        Polygon((5.5426354933, 16.871062618), (1.6789321881, 15.8357864376), (0.6436560077, 11.9720831325), (3.4720831325, 9.1436560077), (7.3357864376, 10.1789321881), (8.371062618, 14.0426354933), align=None)
        with Locations((4.5073593129, 13.0073593129)):
            Circle(F12_R, mode=Mode.SUBTRACT)
        Polygon((-4.4573645067, 16.871062618), (-8.3210678119, 15.8357864376), (-9.3563439923, 11.9720831325), (-6.5279168675, 9.1436560077), (-2.6642135624, 10.1789321881), (-1.628937382, 14.0426354933), align=None)
        with Locations((-5.4926406871, 13.0073593129)):
            Circle(F12_R, mode=Mode.SUBTRACT)
        Polygon((-14.4573645067, 16.871062618), (-18.3210678119, 15.8357864376), (-19.3563439923, 11.9720831325), (-16.5279168675, 9.1436560077), (-12.6642135624, 10.1789321881), (-11.628937382, 14.0426354933), align=None)
        with Locations((-15.4926406871, 13.0073593129)):
            Circle(F12_R, mode=Mode.SUBTRACT)
        Polygon((-24.4573645067, 16.871062618), (-28.3210678119, 15.8357864376), (-29.3563439923, 11.9720831325), (-26.5279168675, 9.1436560077), (-22.6642135624, 10.1789321881), (-21.628937382, 14.0426354933), align=None)
        with Locations((-25.4926406871, 13.0073593129)):
            Circle(F12_R, mode=Mode.SUBTRACT)
        Polygon((-24.4573645067, 26.871062618), (-28.3210678119, 25.8357864376), (-29.3563439923, 21.9720831325), (-26.5279168675, 19.1436560077), (-22.6642135624, 20.1789321881), (-21.628937382, 24.0426354933), align=None)
        with Locations((-25.4926406871, 23.0073593129)):
            Circle(F12_R, mode=Mode.SUBTRACT)
        Polygon((-24.4573645067, 36.871062618), (-28.3210678119, 35.8357864376), (-29.3563439923, 31.9720831325), (-26.5279168675, 29.1436560077), (-22.6642135624, 30.1789321881), (-21.628937382, 34.0426354933), align=None)
        with Locations((-25.4926406871, 33.0073593129)):
            Circle(F12_R, mode=Mode.SUBTRACT)
        Polygon((-24.4573645067, 46.871062618), (-28.3210678119, 45.8357864376), (-29.3563439923, 41.9720831325), (-26.5279168675, 39.1436560077), (-22.6642135624, 40.1789321881), (-21.628937382, 44.0426354933), align=None)
        with Locations((-25.4926406871, 43.0073593129)):
            Circle(F12_R, mode=Mode.SUBTRACT)
        Polygon((-28.3210678119, 55.8357864376), (-29.3563439923, 51.9720831325), (-26.5279168675, 49.1436560077), (-22.6642135624, 50.1789321881), (-21.628937382, 54.0426354933), (-24.4573645067, 56.871062618), align=None)
        with Locations((-25.4926406871, 53.0073593129)):
            Circle(F12_R, mode=Mode.SUBTRACT)
    extrude(amount=F14_DEPTH, mode=Mode.SUBTRACT)


solid = f1_1.part
